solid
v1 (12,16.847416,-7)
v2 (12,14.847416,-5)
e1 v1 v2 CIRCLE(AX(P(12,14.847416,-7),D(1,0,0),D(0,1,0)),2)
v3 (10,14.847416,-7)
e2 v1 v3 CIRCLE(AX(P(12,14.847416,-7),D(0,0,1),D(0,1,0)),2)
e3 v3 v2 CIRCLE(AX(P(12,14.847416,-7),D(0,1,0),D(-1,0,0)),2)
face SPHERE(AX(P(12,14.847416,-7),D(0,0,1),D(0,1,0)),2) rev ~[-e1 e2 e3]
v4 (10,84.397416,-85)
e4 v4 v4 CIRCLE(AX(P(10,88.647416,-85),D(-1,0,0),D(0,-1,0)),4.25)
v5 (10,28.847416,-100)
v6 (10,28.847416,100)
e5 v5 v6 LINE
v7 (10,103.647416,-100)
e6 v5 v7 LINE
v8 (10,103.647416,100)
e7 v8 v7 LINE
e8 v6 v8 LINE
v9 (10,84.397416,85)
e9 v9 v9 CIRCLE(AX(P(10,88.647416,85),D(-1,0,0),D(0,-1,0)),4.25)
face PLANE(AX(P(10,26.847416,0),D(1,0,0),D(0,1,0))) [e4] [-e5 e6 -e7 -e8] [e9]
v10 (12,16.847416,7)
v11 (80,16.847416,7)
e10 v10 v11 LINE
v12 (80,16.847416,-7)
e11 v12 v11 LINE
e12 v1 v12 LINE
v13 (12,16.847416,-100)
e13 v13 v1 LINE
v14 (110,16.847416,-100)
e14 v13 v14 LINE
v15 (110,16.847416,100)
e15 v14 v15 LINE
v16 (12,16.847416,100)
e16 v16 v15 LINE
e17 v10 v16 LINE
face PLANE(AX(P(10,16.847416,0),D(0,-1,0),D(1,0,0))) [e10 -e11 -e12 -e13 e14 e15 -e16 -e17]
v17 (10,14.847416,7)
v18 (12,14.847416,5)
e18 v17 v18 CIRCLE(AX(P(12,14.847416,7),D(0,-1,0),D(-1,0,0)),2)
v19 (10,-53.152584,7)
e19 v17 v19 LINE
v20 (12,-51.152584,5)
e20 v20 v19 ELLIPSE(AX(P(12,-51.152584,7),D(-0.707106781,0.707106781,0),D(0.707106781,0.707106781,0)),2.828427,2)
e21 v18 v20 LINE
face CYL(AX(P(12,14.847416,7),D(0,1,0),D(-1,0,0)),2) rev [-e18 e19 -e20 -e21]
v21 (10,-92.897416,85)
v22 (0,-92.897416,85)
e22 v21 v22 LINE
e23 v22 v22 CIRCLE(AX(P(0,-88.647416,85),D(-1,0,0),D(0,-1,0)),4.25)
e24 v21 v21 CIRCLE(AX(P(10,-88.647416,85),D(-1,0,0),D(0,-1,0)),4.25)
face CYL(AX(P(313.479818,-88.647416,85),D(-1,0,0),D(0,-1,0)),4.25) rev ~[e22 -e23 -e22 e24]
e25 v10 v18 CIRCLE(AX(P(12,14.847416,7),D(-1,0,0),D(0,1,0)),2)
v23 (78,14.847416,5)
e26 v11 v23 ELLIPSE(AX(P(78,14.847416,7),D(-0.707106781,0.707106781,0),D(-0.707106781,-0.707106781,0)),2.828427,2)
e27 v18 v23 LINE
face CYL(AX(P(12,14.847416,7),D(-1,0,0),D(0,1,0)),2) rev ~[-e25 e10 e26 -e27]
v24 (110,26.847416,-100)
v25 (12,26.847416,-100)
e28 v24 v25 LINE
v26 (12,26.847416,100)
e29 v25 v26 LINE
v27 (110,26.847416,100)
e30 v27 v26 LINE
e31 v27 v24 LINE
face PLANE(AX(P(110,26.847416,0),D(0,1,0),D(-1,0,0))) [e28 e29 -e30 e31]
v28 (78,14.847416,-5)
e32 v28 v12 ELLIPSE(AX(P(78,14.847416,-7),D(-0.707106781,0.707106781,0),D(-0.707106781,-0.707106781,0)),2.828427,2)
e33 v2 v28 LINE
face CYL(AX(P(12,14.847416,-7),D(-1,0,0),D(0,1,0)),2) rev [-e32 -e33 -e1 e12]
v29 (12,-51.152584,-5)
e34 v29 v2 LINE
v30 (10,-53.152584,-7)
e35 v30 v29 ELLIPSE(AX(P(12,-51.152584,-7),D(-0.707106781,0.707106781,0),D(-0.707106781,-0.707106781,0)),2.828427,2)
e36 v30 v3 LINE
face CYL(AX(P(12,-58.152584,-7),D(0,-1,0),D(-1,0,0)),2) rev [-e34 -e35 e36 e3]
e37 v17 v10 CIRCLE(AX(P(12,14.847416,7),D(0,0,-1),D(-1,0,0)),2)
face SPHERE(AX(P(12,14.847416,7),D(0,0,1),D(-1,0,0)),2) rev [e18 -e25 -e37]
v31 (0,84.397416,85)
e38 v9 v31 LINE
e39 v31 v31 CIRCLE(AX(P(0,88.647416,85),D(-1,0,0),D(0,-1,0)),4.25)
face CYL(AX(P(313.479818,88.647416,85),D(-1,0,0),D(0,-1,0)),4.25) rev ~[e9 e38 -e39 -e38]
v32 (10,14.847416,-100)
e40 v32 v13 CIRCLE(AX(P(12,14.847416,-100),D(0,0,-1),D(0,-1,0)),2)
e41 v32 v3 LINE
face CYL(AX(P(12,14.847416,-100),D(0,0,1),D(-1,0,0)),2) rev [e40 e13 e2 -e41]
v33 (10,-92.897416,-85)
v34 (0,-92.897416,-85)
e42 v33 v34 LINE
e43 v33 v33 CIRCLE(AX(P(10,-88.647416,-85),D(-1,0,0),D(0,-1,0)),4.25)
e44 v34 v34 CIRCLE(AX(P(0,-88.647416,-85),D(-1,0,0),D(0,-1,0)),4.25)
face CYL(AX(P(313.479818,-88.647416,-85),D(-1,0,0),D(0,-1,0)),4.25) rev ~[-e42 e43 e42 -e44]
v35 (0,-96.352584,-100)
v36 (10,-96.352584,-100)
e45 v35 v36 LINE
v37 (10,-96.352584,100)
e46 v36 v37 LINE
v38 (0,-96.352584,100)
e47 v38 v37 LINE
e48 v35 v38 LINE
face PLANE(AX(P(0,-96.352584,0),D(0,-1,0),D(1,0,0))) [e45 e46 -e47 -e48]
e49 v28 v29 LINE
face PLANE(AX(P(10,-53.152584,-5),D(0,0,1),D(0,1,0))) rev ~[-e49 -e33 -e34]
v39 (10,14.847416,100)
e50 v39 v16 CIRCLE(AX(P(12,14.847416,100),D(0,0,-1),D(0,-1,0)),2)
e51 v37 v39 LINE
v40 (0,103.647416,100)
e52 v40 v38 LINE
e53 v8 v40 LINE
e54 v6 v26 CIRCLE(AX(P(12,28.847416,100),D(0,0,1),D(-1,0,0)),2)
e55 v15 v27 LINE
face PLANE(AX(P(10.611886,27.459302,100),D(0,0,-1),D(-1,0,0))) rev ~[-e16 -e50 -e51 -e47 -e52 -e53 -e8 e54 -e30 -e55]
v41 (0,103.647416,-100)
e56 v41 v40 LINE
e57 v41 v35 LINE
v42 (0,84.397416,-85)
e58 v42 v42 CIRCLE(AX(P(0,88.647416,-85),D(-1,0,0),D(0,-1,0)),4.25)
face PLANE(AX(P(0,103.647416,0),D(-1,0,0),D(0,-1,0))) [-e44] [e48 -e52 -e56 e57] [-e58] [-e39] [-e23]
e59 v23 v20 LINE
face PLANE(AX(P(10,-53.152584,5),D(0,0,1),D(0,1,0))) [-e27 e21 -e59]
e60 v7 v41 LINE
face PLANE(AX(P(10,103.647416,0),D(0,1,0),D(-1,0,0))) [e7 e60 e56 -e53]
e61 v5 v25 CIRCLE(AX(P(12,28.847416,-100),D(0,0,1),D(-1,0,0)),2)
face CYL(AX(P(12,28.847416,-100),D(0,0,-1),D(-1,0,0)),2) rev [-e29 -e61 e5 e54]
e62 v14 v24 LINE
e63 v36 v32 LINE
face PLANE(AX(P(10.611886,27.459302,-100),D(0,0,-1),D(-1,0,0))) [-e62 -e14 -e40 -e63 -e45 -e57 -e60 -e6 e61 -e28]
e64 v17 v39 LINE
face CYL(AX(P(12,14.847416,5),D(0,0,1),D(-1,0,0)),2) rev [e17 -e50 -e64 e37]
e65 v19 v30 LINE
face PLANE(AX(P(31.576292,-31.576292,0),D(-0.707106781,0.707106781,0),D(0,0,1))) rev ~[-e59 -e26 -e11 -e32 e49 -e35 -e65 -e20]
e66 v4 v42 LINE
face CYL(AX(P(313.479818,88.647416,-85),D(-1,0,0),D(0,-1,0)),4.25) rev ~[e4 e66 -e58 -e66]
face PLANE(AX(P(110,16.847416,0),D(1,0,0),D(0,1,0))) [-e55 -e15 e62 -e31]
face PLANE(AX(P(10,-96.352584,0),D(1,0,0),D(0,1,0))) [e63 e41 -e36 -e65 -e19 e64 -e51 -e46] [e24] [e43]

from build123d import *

# Parameters (mm, degrees)
F1_DEPTH     = 100
F2_W         = 70
F2_H         = 10
F3_DEPTH     = 100
F5_R         = 2
F6_DEPTH     = 25
F7_T1_DEPTH  = 200
F7_T6_DEPTH  = 73
F7_T11_DEPTH = 73
F7_T16_DEPTH = 73
F7_T21_DEPTH = 73
F7_T24_ANGLE = 90
F7_T26_ANGLE = 90
F9_D         = 8.5


# Not quite as in the source:
# - a fillet or chamfer that OpenCascade refuses, or shapes differently, is made with other operations: its cross-section is extruded or revolved along the edge and cut away or added


with BuildPart() as f1:
    # F0 (on Top) → F1 (new body, symmetric)
    with BuildSketch(Plane.XY):
        Polygon((10, 103.647416235), (0, 103.647416235), (0, -96.352583765), (10, -96.352583765), (10, 16.847416235), (110, 16.847416235), (110, 26.847416235), (10, 26.847416235), align=None)
    extrude(amount=F1_DEPTH, both=True)

    # F2 (on face) → F3 (join)
    with BuildSketch(Plane.YZ.offset(10)):
        with Locations((-18.152583765, 0)):
            Rectangle(F2_W, F2_H)
    extrude(amount=F3_DEPTH)

    # F5
    f5_edges = [f1.edges().sort_by_distance(p)[0] for p in [
        (10, 16.847416, 52.5),
        (10, 16.847416, -52.5),
    ]]
    fillet(f5_edges, radius=F5_R)

    # F4 (on face) → F6 (cut)
    with BuildSketch(Plane.XY.offset(5)):
        Polygon((110, -53.152583765), (110, 16.847416235), (80, 16.847416235), (10, -53.152583765), align=None)
    extrude(amount=-F6_DEPTH, mode=Mode.SUBTRACT)

    # F7: fillet of radius 2 on 5 edges, made by hand

    # F7_s2 → F7_t1 (join)
    with BuildSketch(Plane.XY.offset(-100)):
        with BuildLine():
            ThreePointArc((10, 28.847416235), (10.5857864376, 27.4332026726), (12, 26.847416235))
            Line((12, 26.847416235), (10, 26.847416235))
            Line((10, 26.847416235), (10, 28.847416235))
        make_face()
    extrude(amount=F7_T1_DEPTH)


with BuildPart() as f7_tool4:
    # F7_s5 → F7_t6 (new body)
    with BuildSketch(Plane.XZ.offset(-14.847416235)):
        with BuildLine():
            ThreePointArc((10, 7), (10.5857864376, 5.5857864376), (12, 5))
            Line((12, 5), (10, 5))
            Line((10, 5), (10, 7))
        make_face()
    extrude(amount=F7_T6_DEPTH)

    split(bisect_by=Plane(origin=(31.5762918825, -31.5762918825, 0), x_dir=(0, 0, 1), z_dir=(-0.7071067812, 0.7071067812, 0)), keep=Keep.TOP)


with BuildPart() as f1_1:
    add(f1.part)

    # F7_t3: union F7_tool4
    add(f7_tool4.part)


with BuildPart() as f7_tool9:
    # F7_s10 → F7_t11 (new body)
    with BuildSketch(Plane.YZ.offset(12)):
        with BuildLine():
            ThreePointArc((16.847416235, 7), (16.2616297973, 5.5857864376), (14.847416235, 5))
            Line((14.847416235, 5), (16.847416235, 5))
            Line((16.847416235, 5), (16.847416235, 7))
        make_face()
    extrude(amount=F7_T11_DEPTH)

    split(bisect_by=Plane(origin=(31.5762918825, -31.5762918825, 0), x_dir=(0, 0, 1), z_dir=(-0.7071067812, 0.7071067812, 0)), keep=Keep.TOP)


with BuildPart() as f1_2:
    add(f1_1.part)

    # F7_t8: union F7_tool9
    add(f7_tool9.part)


with BuildPart() as f7_tool14:
    # F7_s15 → F7_t16 (new body)
    with BuildSketch(Plane.XZ.offset(58.152583765)):
        with BuildLine():
            ThreePointArc((10, -7), (10.5857864376, -5.5857864376), (12, -5))
            Line((12, -5), (10, -5))
            Line((10, -5), (10, -7))
        make_face()
    extrude(amount=-F7_T16_DEPTH)

    split(bisect_by=Plane(origin=(31.5762918825, -31.5762918825, 0), x_dir=(0, 0, 1), z_dir=(-0.7071067812, 0.7071067812, 0)), keep=Keep.TOP)


with BuildPart() as f1_3:
    add(f1_2.part)

    # F7_t13: union F7_tool14
    add(f7_tool14.part)


with BuildPart() as f7_tool19:
    # F7_s20 → F7_t21 (new body)
    with BuildSketch(Plane.YZ.offset(12)):
        with BuildLine():
            ThreePointArc((16.847416235, -7), (16.2616297973, -5.5857864376), (14.847416235, -5))
            Line((14.847416235, -5), (16.847416235, -5))
            Line((16.847416235, -5), (16.847416235, -7))
        make_face()
    extrude(amount=F7_T21_DEPTH)

    split(bisect_by=Plane(origin=(31.5762918825, -31.5762918825, 0), x_dir=(0, 0, 1), z_dir=(-0.7071067812, 0.7071067812, 0)), keep=Keep.TOP)


with BuildPart() as f1_4:
    add(f1_3.part)

    # F7_t18: union F7_tool19
    add(f7_tool19.part)

    # F7_s23 → F7_t24 (revolve)
    with BuildSketch(Plane.YZ.offset(12)):
        with BuildLine():
            ThreePointArc((16.847416235, -7), (16.2616297973, -5.5857864376), (14.847416235, -5))
            Line((14.847416235, -5), (16.847416235, -5))
            Line((16.847416235, -5), (16.847416235, -7))
        make_face()
    revolve(axis=Axis((12, 14.847416235, -5), (0, 0, 1)), revolution_arc=F7_T24_ANGLE)

    # F7_s25 → F7_t26 (revolve)
    with BuildSketch(Plane.XZ.offset(-14.847416235)):
        with BuildLine():
            ThreePointArc((12, 5), (10.5857864376, 5.5857864376), (10, 7))
            Line((10, 7), (10, 5))
            Line((10, 5), (12, 5))
        make_face()
    revolve(axis=Axis((12, 14.847416235, 5), (0, 0, -1)), revolution_arc=F7_T26_ANGLE)

    # F9 (through all)
    with Locations(Plane.YZ.offset(10)):
        with Locations((88.647416235, 85), (88.647416235, -85), (-88.647416235, -85), (-88.647416235, 85)):
            Hole(F9_D / 2)


solid = f1_4.part
